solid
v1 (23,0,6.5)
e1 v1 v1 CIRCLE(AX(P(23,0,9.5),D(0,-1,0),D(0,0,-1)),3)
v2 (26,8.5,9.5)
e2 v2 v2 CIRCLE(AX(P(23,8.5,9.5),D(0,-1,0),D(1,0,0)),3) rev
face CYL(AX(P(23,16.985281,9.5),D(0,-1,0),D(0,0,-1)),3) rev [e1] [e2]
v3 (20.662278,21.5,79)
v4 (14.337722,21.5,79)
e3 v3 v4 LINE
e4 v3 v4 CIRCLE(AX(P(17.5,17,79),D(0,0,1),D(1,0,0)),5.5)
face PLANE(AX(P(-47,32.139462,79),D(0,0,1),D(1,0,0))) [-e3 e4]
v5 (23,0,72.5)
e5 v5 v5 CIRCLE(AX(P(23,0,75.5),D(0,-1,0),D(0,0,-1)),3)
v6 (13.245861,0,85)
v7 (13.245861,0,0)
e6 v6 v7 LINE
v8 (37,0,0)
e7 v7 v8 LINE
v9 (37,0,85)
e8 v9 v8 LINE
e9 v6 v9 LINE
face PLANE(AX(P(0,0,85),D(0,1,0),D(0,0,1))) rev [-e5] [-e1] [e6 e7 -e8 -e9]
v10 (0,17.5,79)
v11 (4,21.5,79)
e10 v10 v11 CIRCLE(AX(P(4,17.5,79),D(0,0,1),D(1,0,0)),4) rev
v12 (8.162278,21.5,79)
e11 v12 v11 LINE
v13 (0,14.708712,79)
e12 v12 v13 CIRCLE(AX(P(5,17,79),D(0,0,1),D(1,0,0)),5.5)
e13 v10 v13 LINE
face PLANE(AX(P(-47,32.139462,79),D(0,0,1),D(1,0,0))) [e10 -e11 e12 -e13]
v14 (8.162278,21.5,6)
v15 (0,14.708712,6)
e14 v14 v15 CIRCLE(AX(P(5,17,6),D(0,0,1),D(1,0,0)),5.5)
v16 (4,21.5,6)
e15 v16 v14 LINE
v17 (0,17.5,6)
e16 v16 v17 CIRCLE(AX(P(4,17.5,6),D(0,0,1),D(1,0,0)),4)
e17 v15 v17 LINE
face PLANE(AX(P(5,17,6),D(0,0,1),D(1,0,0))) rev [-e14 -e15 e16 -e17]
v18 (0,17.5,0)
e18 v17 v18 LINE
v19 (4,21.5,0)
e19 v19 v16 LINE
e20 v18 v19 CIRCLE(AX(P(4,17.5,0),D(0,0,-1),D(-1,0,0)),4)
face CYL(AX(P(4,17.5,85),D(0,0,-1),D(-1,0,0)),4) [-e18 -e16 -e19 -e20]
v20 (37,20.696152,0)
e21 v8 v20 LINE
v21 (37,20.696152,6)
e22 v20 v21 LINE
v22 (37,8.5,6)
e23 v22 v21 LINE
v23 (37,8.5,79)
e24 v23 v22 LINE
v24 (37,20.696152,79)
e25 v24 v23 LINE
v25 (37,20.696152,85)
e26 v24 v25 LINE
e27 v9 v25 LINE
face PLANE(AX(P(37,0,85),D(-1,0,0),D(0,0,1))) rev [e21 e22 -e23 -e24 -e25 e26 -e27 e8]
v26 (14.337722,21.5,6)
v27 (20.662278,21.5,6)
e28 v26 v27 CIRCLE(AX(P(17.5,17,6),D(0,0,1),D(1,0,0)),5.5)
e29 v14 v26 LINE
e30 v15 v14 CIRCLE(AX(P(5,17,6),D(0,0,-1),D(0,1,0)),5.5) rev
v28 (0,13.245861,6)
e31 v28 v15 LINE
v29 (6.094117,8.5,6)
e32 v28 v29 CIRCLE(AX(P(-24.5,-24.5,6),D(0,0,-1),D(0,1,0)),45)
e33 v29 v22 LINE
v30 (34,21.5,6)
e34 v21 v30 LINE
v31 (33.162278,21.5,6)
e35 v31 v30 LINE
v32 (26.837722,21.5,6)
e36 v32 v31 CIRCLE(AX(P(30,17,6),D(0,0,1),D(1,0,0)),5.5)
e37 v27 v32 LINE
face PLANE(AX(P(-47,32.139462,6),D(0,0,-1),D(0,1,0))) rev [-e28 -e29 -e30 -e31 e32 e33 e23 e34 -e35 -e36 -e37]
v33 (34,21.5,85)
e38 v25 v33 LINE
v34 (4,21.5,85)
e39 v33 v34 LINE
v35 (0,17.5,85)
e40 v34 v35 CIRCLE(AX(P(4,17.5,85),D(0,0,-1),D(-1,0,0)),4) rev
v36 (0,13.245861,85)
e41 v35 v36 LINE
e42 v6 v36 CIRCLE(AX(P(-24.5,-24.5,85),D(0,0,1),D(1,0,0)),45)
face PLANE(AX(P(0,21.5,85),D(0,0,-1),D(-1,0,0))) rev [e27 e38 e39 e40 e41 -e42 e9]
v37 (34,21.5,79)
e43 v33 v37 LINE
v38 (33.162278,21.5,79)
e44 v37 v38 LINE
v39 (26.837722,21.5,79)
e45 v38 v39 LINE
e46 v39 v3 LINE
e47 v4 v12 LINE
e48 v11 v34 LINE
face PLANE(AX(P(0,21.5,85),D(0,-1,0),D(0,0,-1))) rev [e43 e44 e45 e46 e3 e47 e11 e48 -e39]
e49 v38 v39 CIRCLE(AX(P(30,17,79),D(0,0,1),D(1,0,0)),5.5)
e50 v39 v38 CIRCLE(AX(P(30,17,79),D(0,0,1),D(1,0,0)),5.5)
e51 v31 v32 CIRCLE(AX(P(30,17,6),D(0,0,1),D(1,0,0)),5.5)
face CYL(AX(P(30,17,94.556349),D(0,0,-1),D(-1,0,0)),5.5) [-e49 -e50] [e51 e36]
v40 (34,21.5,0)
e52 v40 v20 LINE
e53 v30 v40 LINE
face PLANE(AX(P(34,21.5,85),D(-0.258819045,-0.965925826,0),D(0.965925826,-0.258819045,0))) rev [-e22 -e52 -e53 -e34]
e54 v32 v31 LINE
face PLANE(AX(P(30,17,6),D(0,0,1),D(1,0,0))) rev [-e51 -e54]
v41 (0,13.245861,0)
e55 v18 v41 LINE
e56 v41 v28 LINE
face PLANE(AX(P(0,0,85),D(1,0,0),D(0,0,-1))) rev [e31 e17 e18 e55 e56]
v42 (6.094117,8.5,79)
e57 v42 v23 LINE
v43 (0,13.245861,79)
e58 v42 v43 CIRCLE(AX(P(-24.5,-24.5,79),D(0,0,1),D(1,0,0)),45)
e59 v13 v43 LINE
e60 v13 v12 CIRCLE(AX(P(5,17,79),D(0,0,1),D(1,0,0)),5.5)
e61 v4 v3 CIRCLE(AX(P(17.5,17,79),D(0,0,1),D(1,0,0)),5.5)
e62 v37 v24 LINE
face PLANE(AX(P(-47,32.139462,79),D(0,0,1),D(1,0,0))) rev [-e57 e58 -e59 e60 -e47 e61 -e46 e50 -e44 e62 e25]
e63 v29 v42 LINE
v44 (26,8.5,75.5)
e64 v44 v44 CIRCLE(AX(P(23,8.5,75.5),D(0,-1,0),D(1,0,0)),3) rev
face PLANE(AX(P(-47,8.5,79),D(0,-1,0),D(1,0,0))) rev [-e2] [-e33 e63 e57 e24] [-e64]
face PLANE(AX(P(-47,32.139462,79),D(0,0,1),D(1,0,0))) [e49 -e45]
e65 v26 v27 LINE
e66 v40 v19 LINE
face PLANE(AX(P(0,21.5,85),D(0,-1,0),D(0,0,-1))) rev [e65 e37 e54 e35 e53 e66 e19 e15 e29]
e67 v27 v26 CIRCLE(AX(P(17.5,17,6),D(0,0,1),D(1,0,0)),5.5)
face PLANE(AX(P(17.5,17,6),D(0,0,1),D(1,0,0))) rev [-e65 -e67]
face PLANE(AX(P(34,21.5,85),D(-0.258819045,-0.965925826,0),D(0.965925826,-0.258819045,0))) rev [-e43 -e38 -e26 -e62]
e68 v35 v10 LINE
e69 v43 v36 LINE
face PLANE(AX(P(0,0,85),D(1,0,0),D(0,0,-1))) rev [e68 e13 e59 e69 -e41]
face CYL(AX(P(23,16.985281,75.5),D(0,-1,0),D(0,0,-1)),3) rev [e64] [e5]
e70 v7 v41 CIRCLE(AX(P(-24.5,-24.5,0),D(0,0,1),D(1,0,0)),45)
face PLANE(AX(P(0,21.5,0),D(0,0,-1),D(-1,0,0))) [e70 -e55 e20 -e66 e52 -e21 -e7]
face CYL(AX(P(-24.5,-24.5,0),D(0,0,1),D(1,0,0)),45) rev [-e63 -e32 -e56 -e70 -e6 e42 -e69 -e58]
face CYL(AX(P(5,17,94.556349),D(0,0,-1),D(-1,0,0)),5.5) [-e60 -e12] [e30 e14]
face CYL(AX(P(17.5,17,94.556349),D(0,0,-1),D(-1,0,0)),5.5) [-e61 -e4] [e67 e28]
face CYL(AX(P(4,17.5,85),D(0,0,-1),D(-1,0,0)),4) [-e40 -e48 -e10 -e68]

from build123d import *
from OCP.BRepFilletAPI import BRepFilletAPI_MakeChamfer

# Parameters (mm, degrees)
SCHIZZO1_W               = 37
SCHIZZO1_H               = 21.5
ESTRUSIONE1_DEPTH        = 85
SCHIZZO6_W               = 73
SCHIZZO6_H               = 23.639461627
TAGLIO_ESTRUSIONE4_DEPTH = 84
SCHIZZO7_R               = 5.5
ESTRUSIONE4_DEPTH        = 73
SMUSSO1_SIZE             = 3
SMUSSO1_SIZE2            = 0.803847577
RACCORDO1_R              = 4
SCHIZZO8_R               = 45
TAGLIO_ESTRUSIONE5_DEPTH = 96.395230489
SCHIZZO9_R               = 3
TAGLIO_ESTRUSIONE6_DEPTH = 8.5


with BuildPart() as part:
    # Schizzo1 → Estrusione1 (new body)
    with BuildSketch(Plane.XY):
        with Locations((18.5, 10.75)):
            Rectangle(SCHIZZO1_W, SCHIZZO1_H)
    extrude(amount=ESTRUSIONE1_DEPTH)

    # Schizzo6 → Taglio-Estrusione4 (cut)
    with BuildSketch(Plane(origin=(37, 0, 0), x_dir=(0, 0, -1), z_dir=(1, 0, 0))):
        with Locations((-42.5, 20.319730814)):
            Rectangle(SCHIZZO6_W, SCHIZZO6_H)
    extrude(amount=-TAGLIO_ESTRUSIONE4_DEPTH, mode=Mode.SUBTRACT)

    # Schizzo7 → Estrusione4 (add)
    with BuildSketch(Plane.XY.offset(6)):
        with Locations(Location((5, 17, 0), (0, 0, 155.380022671))):
            Circle(SCHIZZO7_R)
        with Locations(Location((17.5, 17, 0), (0, 0, 125.096801228))):
            Circle(SCHIZZO7_R)
        with Locations(Location((30, 17, 0), (0, 0, 125.096801228))):
            Circle(SCHIZZO7_R)
    extrude(amount=ESTRUSIONE4_DEPTH)

    # Smusso1: one chamfer whose edges measure the first distance from different faces: ONE call of the kernel's chamfer builder (chamfer() names one face for all edges)
    smusso1_edges_1 = [part.edges().sort_by_distance(p)[0] for p in [
        (37, 21.5, 3),
    ]]
    smusso1_side_1 = [part.faces().sort_by_distance(p)[0] for p in [
        (18.5, 21.5, 3),
    ]]
    smusso1_edges_2 = [part.edges().sort_by_distance(p)[0] for p in [
        (37, 21.5, 82),
    ]]
    smusso1_side_2 = [part.faces().sort_by_distance(p)[0] for p in [
        (18.5, 21.5, 82),
    ]]
    smusso1 = BRepFilletAPI_MakeChamfer(part.part.solid().wrapped)
    for e in smusso1_edges_1:
        smusso1.Add(SMUSSO1_SIZE, SMUSSO1_SIZE2, e.wrapped, smusso1_side_1[0].wrapped)  # the first distance lies on this face
    for e in smusso1_edges_2:
        smusso1.Add(SMUSSO1_SIZE, SMUSSO1_SIZE2, e.wrapped, smusso1_side_2[0].wrapped)  # the first distance lies on this face
    add(Compound.cast(smusso1.Shape()), mode=Mode.REPLACE)

    # Raccordo1
    # the kernel refuses this fillet: 4 mm, written as the material it takes off along each edge
    with BuildSketch(Plane(origin=(0, 21.5, -10), x_dir=(1, 0, 0), z_dir=(0, 0, 1))) as raccordo1_piece_1:
        with BuildLine():
            CenterArc((RACCORDO1_R, -RACCORDO1_R), RACCORDO1_R, 90, 90)
            Line((0, -RACCORDO1_R), (0, 0))
            Line((0, 0), (RACCORDO1_R, 0))
        make_face()
    extrude(amount=16, mode=Mode.SUBTRACT)
    with BuildSketch(Plane(origin=(0, 21.5, 79), x_dir=(0, -1, 0), z_dir=(0, 0, 1))) as raccordo1_piece_2:
        with BuildLine():
            CenterArc((RACCORDO1_R, RACCORDO1_R), RACCORDO1_R, 180, 90)
            Line((0, RACCORDO1_R), (0, 0))
            Line((0, 0), (RACCORDO1_R, 0))
        make_face()
    extrude(amount=16, mode=Mode.SUBTRACT)

    # Schizzo8 → Taglio-Estrusione5 (cut, through all)
    with BuildSketch(Plane.XY.offset(85)):
        with Locations((-24.5, -24.5)):
            Circle(SCHIZZO8_R)
    extrude(amount=-TAGLIO_ESTRUSIONE5_DEPTH, mode=Mode.SUBTRACT)

    # Schizzo9 → Taglio-Estrusione6 (cut)
    with BuildSketch(Plane.XZ):
        with Locations(Location((23, 75.5, 0), (0, 0, 270))):
            Circle(SCHIZZO9_R)
        with Locations(Location((23, 9.5, 0), (0, 0, 270))):
            Circle(SCHIZZO9_R)
    extrude(amount=-TAGLIO_ESTRUSIONE6_DEPTH, mode=Mode.SUBTRACT)


solid = part.part
